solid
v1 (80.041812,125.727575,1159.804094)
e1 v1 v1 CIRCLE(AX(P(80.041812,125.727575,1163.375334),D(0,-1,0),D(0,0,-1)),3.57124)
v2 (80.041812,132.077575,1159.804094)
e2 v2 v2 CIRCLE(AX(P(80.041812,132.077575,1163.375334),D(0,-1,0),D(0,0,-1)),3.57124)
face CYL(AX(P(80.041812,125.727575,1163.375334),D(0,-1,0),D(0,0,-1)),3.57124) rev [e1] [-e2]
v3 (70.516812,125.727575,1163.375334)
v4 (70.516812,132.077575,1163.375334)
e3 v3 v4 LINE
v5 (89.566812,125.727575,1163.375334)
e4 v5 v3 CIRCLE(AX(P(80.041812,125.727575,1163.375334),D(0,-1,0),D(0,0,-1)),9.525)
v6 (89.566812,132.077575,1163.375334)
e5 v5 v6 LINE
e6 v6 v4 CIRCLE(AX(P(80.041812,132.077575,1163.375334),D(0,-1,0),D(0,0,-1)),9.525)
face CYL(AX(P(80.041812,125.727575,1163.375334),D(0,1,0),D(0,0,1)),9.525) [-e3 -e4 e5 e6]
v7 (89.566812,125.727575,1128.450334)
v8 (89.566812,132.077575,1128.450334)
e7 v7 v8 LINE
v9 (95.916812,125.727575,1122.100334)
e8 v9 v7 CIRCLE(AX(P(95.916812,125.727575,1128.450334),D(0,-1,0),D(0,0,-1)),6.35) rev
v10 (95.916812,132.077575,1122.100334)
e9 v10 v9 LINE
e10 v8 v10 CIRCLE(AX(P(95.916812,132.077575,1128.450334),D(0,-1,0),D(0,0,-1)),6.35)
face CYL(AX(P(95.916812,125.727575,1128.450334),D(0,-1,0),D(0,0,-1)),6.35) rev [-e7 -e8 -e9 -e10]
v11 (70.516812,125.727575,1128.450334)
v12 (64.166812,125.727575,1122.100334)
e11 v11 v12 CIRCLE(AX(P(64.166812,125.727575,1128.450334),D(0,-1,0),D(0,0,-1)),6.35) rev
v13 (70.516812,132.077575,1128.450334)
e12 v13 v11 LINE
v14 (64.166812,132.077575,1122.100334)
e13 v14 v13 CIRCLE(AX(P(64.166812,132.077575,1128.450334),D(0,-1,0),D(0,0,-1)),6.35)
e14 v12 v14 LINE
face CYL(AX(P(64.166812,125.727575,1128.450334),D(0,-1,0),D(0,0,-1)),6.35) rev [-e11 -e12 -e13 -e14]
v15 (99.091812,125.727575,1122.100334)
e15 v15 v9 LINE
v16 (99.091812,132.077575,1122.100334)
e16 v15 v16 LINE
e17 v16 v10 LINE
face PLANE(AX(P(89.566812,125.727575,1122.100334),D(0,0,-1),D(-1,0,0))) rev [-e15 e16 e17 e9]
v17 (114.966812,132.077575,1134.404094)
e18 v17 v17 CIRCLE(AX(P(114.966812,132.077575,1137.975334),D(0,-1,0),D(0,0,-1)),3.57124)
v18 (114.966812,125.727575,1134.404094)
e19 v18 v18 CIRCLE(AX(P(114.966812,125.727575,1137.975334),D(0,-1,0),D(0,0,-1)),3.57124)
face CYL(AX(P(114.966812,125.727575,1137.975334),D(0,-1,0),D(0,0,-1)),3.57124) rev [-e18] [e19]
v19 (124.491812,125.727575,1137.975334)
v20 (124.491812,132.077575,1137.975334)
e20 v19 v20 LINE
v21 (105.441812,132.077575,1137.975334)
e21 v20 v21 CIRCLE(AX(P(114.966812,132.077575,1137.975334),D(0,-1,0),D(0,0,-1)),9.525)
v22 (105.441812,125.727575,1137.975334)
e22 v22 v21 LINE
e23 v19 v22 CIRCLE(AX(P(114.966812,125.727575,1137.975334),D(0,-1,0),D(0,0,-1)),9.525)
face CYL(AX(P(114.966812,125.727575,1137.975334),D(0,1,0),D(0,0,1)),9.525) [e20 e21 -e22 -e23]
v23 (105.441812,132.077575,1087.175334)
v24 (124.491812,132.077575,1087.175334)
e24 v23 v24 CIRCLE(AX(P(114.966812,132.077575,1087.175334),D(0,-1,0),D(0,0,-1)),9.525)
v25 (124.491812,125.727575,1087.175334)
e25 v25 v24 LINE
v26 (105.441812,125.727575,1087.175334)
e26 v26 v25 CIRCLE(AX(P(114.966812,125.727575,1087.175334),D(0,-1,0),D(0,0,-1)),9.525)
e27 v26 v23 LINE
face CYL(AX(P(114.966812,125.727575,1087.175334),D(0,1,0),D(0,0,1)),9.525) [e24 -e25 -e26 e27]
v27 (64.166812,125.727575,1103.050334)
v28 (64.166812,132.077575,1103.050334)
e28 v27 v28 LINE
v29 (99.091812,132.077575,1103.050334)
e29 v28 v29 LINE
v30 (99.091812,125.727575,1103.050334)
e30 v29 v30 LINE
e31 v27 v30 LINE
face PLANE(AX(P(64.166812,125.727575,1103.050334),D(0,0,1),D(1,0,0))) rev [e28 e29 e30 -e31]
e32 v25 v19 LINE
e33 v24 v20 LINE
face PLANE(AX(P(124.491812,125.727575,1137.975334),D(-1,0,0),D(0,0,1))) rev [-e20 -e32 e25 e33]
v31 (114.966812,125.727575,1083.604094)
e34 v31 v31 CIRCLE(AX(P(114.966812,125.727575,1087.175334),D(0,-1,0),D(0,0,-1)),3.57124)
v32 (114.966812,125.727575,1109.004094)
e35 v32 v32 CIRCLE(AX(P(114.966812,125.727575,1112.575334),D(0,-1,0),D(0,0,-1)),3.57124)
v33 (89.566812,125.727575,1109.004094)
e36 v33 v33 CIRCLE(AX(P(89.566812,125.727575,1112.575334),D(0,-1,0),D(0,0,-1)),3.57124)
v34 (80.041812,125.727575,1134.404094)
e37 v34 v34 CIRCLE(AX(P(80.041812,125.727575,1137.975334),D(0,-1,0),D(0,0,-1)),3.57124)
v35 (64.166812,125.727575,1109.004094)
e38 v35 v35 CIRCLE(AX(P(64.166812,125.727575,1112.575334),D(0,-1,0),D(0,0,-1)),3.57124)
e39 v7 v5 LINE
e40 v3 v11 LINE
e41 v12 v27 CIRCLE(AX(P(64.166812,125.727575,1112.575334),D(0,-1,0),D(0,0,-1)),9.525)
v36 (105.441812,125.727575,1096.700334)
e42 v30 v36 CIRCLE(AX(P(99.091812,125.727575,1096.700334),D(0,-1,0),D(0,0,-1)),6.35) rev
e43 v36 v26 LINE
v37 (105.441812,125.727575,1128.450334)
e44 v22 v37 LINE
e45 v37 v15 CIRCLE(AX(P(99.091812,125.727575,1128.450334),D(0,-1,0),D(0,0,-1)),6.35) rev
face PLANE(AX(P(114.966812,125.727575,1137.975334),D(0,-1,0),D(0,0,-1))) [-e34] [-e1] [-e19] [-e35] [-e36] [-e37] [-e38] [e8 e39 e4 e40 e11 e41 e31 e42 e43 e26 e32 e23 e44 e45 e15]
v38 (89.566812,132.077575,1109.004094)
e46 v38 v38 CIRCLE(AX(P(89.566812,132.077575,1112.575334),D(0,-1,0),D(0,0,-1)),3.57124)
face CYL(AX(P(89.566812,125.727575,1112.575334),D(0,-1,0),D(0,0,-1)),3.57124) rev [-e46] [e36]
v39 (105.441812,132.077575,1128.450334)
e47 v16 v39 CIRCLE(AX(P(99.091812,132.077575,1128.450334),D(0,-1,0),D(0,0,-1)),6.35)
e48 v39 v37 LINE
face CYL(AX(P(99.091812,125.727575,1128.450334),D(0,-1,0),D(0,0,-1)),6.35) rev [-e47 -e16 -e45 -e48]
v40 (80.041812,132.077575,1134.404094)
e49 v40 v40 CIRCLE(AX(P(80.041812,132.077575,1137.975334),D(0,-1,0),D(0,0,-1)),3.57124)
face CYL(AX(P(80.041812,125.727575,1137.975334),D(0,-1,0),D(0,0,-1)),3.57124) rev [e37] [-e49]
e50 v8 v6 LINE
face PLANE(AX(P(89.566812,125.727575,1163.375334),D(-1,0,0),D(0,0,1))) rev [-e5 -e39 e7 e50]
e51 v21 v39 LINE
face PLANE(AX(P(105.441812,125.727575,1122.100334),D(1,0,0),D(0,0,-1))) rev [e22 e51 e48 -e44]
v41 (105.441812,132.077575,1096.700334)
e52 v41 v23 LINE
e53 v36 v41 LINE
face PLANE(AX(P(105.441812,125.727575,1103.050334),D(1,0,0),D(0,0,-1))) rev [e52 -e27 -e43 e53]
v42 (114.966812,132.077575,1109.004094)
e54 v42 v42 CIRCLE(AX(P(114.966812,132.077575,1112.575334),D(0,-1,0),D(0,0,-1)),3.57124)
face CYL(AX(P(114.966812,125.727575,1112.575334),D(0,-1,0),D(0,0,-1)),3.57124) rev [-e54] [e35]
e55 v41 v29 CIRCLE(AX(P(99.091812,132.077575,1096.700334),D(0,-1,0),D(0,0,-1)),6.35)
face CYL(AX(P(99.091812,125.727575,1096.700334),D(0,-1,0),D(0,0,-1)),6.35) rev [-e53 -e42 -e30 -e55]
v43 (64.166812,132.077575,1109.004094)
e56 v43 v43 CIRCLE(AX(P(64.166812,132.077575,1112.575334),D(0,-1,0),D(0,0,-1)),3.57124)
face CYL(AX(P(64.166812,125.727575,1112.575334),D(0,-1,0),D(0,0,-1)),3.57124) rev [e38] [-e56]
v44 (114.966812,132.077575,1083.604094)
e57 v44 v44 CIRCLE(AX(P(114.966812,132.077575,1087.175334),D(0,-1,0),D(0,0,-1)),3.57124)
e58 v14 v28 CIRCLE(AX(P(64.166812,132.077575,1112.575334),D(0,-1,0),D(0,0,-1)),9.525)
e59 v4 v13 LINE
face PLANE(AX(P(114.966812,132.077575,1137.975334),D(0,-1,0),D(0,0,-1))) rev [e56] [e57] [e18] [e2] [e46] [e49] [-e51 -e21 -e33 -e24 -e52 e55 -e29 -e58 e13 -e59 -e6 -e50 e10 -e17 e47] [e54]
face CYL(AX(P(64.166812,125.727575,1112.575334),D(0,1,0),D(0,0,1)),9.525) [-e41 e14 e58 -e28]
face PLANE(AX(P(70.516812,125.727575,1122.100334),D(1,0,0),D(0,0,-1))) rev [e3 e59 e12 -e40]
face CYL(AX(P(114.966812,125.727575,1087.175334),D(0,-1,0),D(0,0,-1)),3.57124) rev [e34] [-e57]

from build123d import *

# Parameters (mm, degrees)
BOSS_EXTRUDE2_START     = 12.827
BOSS_EXTRUDE2_DEPTH     = 6.35
F_1_4_CLEARANCE_HOLE2_D = 7.14248
FILLET2_R               = 6.35


with BuildPart() as part:
    # Sketch5 → Boss-Extrude2 (new body)
    with BuildSketch(Plane(origin=(0, 144.904574554, 0), x_dir=(-1, 0, 0), z_dir=(0, -1, 0)).offset(BOSS_EXTRUDE2_START)):
        with BuildLine():
            Line((-124.491812484, -1137.975334154), (-124.491812484, -1087.175334154))
            ThreePointArc((-124.491812484, -1087.175334154), (-114.966812484, -1077.650334154), (-105.441812484, -1087.175334154))
            Line((-105.441812484, -1087.175334154), (-105.441812484, -1103.050334154))
            Line((-105.441812484, -1103.050334154), (-64.166812484, -1103.050334154))
            ThreePointArc((-64.166812484, -1103.050334154), (-54.641812484, -1112.575334154), (-64.166812484, -1122.100334154))
            Line((-64.166812484, -1122.100334154), (-70.516812484, -1122.100334154))
            Line((-70.516812484, -1122.100334154), (-70.516812484, -1163.375334154))
            ThreePointArc((-70.516812484, -1163.375334154), (-80.041812484, -1172.900334154), (-89.566812484, -1163.375334154))
            Line((-89.566812484, -1163.375334154), (-89.566812484, -1122.100334154))
            Line((-89.566812484, -1122.100334154), (-105.441812484, -1122.100334154))
            Line((-105.441812484, -1122.100334154), (-105.441812484, -1137.975334154))
            ThreePointArc((-105.441812484, -1137.975334154), (-114.966812484, -1147.500334154), (-124.491812484, -1137.975334154))
        make_face()
    extrude(amount=BOSS_EXTRUDE2_DEPTH)

    # 1/4 Clearance Hole2 (through all)
    with Locations(Plane(origin=(0, 125.727574554, 0), x_dir=(-1, 0, 0), z_dir=(0, -1, 0))):
        with Locations((-114.966812484, -1087.175334154), (-114.966812484, -1137.975334154), (-114.966812484, -1112.575334154), (-89.566812484, -1112.575334154), (-64.166812484, -1112.575334154), (-80.041812484, -1137.975334154), (-80.041812484, -1163.375334154)):
            Hole(F_1_4_CLEARANCE_HOLE2_D / 2)

    # Fillet2
    fillet2_edges = [part.edges().sort_by_distance(p)[0] for p in [
        (105.441812484, 128.902574554, 1103.050334154),
        (70.516812484, 128.902574554, 1122.100334154),
        (89.566812484, 128.902574554, 1122.100334154),
        (105.441812484, 128.902574554, 1122.100334154),
    ]]
    fillet(fillet2_edges, radius=FILLET2_R - 0.0001)  # a hair under: the kernel refuses the full size


solid = part.part
